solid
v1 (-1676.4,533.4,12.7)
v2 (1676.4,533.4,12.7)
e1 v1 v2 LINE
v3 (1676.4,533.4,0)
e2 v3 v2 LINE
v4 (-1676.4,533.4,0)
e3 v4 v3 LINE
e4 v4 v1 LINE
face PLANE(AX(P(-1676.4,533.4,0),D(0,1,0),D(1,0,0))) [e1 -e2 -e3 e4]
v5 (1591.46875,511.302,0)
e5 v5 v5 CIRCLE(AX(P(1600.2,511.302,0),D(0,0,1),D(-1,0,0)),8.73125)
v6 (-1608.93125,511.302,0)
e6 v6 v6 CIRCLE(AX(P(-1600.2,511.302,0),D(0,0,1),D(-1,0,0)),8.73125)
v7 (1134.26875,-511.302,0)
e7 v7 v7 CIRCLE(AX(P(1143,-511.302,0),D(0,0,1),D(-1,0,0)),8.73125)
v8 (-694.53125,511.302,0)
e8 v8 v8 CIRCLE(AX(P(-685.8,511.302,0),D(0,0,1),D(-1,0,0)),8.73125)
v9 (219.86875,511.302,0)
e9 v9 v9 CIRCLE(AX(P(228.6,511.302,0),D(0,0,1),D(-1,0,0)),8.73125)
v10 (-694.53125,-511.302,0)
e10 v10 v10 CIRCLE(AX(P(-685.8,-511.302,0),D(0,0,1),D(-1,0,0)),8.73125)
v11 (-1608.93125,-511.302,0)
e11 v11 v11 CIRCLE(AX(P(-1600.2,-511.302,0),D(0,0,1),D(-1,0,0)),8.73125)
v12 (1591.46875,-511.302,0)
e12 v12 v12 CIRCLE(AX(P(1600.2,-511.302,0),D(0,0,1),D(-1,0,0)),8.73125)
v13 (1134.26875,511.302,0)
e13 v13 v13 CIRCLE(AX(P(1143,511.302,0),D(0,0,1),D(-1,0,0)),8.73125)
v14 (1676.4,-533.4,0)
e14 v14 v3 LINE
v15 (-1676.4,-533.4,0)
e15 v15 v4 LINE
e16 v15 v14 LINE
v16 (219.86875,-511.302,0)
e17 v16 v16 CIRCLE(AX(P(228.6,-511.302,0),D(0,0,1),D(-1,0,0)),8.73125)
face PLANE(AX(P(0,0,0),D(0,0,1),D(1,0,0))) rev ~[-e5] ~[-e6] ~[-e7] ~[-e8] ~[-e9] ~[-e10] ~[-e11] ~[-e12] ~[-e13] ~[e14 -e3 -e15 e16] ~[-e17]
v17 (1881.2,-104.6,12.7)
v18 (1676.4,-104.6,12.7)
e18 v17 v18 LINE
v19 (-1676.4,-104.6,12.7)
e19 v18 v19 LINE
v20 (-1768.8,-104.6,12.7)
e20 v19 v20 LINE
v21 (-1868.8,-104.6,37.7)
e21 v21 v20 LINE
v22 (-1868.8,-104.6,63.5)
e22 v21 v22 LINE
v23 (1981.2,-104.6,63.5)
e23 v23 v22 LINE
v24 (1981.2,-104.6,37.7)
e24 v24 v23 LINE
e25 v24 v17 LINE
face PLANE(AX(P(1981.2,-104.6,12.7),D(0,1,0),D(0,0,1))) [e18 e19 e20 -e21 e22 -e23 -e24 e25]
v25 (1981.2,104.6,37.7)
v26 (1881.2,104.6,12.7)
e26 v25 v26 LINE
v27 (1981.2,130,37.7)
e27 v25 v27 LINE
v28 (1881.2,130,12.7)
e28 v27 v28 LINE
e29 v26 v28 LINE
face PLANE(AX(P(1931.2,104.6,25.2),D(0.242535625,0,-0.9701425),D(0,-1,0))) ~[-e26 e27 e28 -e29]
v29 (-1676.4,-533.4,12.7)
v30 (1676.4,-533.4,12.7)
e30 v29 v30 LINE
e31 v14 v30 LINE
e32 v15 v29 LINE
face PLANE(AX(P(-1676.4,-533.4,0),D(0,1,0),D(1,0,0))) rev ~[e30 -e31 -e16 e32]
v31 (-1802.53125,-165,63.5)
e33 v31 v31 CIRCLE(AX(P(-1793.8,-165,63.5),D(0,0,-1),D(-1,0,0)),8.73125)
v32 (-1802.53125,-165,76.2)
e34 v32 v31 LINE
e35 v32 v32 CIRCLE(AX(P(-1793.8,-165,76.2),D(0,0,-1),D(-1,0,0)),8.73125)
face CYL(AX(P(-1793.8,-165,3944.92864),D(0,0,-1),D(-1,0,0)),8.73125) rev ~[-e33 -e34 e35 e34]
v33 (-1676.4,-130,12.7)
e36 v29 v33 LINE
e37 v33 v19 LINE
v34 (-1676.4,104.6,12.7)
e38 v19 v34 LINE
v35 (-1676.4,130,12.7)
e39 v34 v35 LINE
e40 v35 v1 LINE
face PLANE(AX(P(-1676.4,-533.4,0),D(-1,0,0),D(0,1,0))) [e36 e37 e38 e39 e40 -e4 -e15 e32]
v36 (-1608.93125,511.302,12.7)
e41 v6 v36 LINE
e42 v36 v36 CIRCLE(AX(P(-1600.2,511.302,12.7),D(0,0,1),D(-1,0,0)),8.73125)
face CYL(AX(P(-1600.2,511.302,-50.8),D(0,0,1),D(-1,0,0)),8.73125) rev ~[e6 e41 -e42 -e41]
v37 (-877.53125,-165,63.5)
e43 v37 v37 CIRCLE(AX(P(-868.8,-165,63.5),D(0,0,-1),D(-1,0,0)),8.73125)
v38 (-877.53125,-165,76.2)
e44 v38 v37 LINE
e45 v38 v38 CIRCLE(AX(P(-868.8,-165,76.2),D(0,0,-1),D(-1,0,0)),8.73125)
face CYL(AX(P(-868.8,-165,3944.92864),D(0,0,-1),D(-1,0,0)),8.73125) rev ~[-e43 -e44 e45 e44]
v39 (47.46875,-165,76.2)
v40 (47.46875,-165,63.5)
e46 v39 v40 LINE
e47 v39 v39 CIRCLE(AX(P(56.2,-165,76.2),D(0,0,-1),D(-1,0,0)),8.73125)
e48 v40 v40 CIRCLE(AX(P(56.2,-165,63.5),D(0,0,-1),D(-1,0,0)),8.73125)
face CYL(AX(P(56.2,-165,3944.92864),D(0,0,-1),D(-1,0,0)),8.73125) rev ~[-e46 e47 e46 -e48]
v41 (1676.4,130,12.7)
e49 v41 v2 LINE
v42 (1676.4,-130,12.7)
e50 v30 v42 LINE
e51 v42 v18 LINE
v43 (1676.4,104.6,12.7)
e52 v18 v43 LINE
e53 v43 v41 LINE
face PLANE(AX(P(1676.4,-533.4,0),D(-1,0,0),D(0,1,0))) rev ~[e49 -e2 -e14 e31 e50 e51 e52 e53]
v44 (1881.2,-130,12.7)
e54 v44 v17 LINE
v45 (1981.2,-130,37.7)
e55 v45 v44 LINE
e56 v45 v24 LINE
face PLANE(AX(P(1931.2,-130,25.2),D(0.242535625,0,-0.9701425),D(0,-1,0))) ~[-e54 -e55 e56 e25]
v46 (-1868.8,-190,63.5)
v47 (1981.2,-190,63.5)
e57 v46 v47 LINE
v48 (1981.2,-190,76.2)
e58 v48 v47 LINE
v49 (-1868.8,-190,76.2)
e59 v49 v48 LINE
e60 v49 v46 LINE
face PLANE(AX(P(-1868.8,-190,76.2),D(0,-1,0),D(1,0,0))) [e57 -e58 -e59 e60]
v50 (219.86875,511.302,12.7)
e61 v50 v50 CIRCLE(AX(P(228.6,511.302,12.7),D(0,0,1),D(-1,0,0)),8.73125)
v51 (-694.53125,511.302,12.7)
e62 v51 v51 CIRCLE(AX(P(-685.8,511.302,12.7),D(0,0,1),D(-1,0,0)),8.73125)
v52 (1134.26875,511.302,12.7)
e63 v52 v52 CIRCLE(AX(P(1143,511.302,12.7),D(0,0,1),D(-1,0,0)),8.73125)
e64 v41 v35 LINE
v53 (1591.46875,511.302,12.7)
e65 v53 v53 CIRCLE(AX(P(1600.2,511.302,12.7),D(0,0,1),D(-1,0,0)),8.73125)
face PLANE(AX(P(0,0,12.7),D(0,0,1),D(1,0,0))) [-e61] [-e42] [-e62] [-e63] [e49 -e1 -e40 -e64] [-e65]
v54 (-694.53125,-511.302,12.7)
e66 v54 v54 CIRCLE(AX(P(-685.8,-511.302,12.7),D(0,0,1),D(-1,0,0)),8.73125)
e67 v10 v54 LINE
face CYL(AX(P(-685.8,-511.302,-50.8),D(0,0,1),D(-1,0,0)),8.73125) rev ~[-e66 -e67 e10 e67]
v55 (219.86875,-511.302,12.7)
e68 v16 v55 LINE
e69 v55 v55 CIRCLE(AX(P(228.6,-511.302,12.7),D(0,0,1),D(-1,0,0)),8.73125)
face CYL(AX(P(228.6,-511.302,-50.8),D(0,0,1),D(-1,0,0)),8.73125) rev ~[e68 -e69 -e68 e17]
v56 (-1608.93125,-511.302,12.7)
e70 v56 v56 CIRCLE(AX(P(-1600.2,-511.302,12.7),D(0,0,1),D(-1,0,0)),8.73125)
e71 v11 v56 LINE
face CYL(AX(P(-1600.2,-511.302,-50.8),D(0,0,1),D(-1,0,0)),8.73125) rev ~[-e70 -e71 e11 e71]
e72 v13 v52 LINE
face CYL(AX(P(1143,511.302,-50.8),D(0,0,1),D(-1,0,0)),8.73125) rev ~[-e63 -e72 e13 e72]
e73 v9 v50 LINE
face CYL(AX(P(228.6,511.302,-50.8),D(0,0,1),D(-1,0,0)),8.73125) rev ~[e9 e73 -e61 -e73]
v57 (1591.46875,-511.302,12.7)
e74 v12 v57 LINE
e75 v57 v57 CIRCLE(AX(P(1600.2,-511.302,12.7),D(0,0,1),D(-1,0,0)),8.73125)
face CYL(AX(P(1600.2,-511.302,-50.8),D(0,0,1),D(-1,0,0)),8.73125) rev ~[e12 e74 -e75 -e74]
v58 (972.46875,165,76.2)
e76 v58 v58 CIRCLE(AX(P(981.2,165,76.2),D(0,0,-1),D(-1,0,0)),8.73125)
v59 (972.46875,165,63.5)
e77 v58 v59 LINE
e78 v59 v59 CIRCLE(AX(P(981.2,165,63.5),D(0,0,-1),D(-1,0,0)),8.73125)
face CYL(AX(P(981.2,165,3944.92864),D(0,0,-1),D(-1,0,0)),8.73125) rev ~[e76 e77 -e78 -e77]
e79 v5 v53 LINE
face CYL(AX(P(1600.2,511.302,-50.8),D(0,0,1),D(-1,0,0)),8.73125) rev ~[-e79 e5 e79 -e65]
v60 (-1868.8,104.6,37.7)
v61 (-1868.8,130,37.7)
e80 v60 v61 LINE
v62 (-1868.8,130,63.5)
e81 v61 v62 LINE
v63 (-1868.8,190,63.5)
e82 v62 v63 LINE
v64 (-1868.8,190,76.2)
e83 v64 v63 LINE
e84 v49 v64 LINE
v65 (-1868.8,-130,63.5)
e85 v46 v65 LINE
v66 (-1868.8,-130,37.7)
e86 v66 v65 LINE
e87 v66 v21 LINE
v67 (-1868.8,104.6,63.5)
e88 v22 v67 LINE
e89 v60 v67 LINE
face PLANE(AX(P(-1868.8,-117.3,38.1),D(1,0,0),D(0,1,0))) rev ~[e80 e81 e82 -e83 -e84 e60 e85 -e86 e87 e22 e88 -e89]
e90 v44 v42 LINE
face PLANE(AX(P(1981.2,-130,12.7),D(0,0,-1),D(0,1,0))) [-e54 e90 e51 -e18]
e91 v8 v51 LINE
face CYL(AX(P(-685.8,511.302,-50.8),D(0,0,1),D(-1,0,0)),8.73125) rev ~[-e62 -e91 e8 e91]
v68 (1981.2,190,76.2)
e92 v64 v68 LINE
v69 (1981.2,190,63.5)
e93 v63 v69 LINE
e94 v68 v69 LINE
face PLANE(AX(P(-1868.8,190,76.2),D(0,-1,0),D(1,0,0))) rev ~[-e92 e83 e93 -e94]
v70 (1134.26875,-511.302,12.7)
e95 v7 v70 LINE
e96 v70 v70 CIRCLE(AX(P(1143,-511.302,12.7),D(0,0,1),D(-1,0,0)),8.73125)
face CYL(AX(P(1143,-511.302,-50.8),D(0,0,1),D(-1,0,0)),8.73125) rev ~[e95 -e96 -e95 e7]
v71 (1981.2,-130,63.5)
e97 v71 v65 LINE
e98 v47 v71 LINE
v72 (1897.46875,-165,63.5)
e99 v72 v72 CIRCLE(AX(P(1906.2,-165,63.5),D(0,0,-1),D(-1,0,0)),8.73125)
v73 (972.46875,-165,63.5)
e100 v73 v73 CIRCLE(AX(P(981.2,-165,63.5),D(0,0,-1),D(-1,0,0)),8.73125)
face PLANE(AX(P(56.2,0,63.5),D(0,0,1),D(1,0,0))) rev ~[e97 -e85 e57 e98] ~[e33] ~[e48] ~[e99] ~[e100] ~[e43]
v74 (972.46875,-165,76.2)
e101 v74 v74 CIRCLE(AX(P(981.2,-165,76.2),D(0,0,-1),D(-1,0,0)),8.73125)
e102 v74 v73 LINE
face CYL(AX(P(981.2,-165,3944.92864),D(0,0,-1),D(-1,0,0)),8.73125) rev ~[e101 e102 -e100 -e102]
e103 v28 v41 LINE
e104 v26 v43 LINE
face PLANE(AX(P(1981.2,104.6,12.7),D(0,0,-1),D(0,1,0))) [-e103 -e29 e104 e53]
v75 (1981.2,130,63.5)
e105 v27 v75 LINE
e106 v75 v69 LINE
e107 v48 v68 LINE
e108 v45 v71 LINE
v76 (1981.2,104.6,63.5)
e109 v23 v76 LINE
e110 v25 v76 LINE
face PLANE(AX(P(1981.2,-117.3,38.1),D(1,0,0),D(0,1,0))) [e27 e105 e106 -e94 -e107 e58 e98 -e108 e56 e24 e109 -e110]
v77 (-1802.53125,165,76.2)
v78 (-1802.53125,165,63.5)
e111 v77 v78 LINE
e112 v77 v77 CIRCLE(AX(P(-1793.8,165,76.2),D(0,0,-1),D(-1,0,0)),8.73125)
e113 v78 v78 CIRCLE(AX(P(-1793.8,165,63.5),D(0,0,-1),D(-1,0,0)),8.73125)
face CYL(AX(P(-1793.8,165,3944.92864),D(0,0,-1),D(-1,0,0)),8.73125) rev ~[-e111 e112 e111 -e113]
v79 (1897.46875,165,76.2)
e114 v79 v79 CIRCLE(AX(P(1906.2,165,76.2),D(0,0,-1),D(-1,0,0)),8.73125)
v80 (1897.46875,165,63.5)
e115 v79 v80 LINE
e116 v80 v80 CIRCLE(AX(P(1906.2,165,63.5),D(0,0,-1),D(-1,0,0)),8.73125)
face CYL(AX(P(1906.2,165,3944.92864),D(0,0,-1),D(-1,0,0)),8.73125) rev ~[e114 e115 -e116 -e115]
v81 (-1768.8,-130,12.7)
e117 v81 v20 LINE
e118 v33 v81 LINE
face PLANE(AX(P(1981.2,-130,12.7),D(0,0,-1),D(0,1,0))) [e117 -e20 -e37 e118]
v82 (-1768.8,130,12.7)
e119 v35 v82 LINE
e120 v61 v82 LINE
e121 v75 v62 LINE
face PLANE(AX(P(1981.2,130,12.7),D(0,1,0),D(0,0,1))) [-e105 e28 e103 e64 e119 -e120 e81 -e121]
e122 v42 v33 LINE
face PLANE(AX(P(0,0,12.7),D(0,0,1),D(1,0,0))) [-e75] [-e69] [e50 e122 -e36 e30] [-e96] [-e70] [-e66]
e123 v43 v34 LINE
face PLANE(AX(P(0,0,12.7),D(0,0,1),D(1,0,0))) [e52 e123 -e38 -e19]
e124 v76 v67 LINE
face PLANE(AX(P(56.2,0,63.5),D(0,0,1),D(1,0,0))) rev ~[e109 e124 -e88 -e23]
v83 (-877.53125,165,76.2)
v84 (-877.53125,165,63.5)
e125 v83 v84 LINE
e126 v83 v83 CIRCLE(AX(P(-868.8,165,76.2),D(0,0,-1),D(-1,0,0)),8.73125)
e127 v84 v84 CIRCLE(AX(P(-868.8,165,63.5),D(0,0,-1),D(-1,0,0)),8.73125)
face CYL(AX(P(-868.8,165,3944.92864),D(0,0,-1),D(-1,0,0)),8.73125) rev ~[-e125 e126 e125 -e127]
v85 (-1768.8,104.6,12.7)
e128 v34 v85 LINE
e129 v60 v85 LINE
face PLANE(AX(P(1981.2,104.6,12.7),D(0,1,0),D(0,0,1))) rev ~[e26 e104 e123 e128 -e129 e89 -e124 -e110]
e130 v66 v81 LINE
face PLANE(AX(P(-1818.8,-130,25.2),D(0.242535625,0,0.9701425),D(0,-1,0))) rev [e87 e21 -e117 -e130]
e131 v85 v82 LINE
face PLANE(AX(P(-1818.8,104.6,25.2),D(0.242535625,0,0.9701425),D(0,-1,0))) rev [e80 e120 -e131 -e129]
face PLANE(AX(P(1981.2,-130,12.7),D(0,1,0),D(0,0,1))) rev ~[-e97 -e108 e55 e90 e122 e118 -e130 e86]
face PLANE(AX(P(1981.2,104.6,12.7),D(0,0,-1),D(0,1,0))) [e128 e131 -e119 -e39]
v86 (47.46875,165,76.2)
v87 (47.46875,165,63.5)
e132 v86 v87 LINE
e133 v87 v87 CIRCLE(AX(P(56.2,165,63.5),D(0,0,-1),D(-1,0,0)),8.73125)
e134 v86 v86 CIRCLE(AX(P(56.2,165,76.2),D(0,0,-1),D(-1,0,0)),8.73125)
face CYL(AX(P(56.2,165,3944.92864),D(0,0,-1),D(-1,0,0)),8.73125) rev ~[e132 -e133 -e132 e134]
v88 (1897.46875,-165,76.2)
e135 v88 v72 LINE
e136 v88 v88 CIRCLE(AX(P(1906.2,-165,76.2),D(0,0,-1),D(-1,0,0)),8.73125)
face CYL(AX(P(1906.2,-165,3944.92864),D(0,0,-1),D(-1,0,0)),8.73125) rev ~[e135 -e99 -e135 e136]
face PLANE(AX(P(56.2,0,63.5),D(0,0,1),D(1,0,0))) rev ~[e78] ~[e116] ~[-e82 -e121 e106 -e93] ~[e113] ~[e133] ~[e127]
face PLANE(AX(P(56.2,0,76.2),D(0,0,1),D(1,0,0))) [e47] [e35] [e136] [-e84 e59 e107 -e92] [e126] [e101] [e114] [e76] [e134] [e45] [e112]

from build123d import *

# Parameters (mm, degrees)
F0_W      = 3352.8
F0_H      = 1066.8
F1_DEPTH  = 12.7
F2_D      = 17.4625
F2_DEPTH  = 50.8
F2_TIP    = 5.2462642799
F4_W      = 3850
F4_H      = 380
F5_DEPTH  = 12.7
F7_D      = 17.4625
F8_W      = 25.4
F8_H      = 50.8
F9_DEPTH  = 3850
F10_SIZE2 = 100
F10_SIZE  = 25
F11_SIZE2 = 100
F11_SIZE  = 25
F12_SIZE2 = 100
F12_SIZE  = 25
F13_SIZE2 = 100
F13_SIZE  = 25


# Not quite as in the source:
# - a length typed as a fraction of an inch, garbled in the dataset ("3 / 203.2 mm" for 3/8 in), is restored


with BuildPart() as f1:
    # F0 (on Top) → F1 (new body)
    with BuildSketch(Plane.XY):
        Rectangle(F0_W, F0_H)
    extrude(amount=F1_DEPTH)

    # F2
    with Locations(Plane(origin=(0, 0, 0), x_dir=(1, 0, 0), z_dir=(0, 0, -1))):
        with Locations((-1600.2, -511.302), (-685.8, -511.302), (228.6, -511.302), (1143, -511.302), (1600.2, -511.302), (1600.2, 511.302), (1143, 511.302), (228.6, 511.302), (-685.8, 511.302), (-1600.2, 511.302)):
            Hole(F2_D / 2, depth=F2_DEPTH)
            with Locations((0, 0, -(F2_DEPTH + F2_TIP / 2))):  # 118° drill point
                Cone(0, F2_D / 2, F2_TIP, mode=Mode.SUBTRACT)



with BuildPart() as f5:
    # F4 (on offset) → F5 (new body)
    with BuildSketch(Plane.XY.offset(76.2)):
        with Locations((56.2, 0)):
            Rectangle(F4_W, F4_H)
    extrude(amount=-F5_DEPTH)

    # F7 (through all)
    with Locations(Plane.XY.offset(76.2)):
        with Locations((-1793.8, 165), (-1793.8, -165), (-868.8, 165), (-868.8, -165), (56.2, 165), (981.2, 165), (56.2, -165), (981.2, -165), (1906.2, 165), (1906.2, -165)):
            Hole(F7_D / 2)


with BuildPart() as f1_1:
    add(f1.part)

    add(f5.part)  # F9 merges F5
    # F8 (on face) → F9 (join)
    with BuildSketch(Plane.YZ.offset(1981.2)):
        with Locations((-117.3, 38.1)):
            Rectangle(F8_W, F8_H)
        with Locations((117.3, 38.1)):
            Rectangle(F8_W, F8_H)
    extrude(amount=-F9_DEPTH)

    # F10
    f10_edges = [f1_1.edges().sort_by_distance(p)[0] for p in [
        (-1868.8, 117.3, 12.7),
    ]]
    f10_side = f1_1.faces().sort_by_distance((-1868.8, 186.147309, 69.85))[0]
    chamfer(f10_edges, length=F10_SIZE, length2=F10_SIZE2, reference=f10_side)

    # F11
    f11_edges = [f1_1.edges().sort_by_distance(p)[0] for p in [
        (-1868.8, -117.3, 12.7),
    ]]
    f11_side = f1_1.faces().sort_by_distance((-1868.8, 126.147309, 50.6))[0]
    chamfer(f11_edges, length=F11_SIZE, length2=F11_SIZE2, reference=f11_side)

    # F12
    f12_edges = [f1_1.edges().sort_by_distance(p)[0] for p in [
        (1981.2, 117.3, 12.7),
    ]]
    f12_side = f1_1.faces().sort_by_distance((1981.2, -186.147309, 69.85))[0]
    chamfer(f12_edges, length=F12_SIZE, length2=F12_SIZE2, reference=f12_side)

    # F13
    f13_edges = [f1_1.edges().sort_by_distance(p)[0] for p in [
        (1981.2, -117.3, 12.7),
    ]]
    f13_side = f1_1.faces().sort_by_distance((1981.2, 108.452691, 50.6))[0]
    chamfer(f13_edges, length=F13_SIZE, length2=F13_SIZE2, reference=f13_side)


solid = f1_1.part
